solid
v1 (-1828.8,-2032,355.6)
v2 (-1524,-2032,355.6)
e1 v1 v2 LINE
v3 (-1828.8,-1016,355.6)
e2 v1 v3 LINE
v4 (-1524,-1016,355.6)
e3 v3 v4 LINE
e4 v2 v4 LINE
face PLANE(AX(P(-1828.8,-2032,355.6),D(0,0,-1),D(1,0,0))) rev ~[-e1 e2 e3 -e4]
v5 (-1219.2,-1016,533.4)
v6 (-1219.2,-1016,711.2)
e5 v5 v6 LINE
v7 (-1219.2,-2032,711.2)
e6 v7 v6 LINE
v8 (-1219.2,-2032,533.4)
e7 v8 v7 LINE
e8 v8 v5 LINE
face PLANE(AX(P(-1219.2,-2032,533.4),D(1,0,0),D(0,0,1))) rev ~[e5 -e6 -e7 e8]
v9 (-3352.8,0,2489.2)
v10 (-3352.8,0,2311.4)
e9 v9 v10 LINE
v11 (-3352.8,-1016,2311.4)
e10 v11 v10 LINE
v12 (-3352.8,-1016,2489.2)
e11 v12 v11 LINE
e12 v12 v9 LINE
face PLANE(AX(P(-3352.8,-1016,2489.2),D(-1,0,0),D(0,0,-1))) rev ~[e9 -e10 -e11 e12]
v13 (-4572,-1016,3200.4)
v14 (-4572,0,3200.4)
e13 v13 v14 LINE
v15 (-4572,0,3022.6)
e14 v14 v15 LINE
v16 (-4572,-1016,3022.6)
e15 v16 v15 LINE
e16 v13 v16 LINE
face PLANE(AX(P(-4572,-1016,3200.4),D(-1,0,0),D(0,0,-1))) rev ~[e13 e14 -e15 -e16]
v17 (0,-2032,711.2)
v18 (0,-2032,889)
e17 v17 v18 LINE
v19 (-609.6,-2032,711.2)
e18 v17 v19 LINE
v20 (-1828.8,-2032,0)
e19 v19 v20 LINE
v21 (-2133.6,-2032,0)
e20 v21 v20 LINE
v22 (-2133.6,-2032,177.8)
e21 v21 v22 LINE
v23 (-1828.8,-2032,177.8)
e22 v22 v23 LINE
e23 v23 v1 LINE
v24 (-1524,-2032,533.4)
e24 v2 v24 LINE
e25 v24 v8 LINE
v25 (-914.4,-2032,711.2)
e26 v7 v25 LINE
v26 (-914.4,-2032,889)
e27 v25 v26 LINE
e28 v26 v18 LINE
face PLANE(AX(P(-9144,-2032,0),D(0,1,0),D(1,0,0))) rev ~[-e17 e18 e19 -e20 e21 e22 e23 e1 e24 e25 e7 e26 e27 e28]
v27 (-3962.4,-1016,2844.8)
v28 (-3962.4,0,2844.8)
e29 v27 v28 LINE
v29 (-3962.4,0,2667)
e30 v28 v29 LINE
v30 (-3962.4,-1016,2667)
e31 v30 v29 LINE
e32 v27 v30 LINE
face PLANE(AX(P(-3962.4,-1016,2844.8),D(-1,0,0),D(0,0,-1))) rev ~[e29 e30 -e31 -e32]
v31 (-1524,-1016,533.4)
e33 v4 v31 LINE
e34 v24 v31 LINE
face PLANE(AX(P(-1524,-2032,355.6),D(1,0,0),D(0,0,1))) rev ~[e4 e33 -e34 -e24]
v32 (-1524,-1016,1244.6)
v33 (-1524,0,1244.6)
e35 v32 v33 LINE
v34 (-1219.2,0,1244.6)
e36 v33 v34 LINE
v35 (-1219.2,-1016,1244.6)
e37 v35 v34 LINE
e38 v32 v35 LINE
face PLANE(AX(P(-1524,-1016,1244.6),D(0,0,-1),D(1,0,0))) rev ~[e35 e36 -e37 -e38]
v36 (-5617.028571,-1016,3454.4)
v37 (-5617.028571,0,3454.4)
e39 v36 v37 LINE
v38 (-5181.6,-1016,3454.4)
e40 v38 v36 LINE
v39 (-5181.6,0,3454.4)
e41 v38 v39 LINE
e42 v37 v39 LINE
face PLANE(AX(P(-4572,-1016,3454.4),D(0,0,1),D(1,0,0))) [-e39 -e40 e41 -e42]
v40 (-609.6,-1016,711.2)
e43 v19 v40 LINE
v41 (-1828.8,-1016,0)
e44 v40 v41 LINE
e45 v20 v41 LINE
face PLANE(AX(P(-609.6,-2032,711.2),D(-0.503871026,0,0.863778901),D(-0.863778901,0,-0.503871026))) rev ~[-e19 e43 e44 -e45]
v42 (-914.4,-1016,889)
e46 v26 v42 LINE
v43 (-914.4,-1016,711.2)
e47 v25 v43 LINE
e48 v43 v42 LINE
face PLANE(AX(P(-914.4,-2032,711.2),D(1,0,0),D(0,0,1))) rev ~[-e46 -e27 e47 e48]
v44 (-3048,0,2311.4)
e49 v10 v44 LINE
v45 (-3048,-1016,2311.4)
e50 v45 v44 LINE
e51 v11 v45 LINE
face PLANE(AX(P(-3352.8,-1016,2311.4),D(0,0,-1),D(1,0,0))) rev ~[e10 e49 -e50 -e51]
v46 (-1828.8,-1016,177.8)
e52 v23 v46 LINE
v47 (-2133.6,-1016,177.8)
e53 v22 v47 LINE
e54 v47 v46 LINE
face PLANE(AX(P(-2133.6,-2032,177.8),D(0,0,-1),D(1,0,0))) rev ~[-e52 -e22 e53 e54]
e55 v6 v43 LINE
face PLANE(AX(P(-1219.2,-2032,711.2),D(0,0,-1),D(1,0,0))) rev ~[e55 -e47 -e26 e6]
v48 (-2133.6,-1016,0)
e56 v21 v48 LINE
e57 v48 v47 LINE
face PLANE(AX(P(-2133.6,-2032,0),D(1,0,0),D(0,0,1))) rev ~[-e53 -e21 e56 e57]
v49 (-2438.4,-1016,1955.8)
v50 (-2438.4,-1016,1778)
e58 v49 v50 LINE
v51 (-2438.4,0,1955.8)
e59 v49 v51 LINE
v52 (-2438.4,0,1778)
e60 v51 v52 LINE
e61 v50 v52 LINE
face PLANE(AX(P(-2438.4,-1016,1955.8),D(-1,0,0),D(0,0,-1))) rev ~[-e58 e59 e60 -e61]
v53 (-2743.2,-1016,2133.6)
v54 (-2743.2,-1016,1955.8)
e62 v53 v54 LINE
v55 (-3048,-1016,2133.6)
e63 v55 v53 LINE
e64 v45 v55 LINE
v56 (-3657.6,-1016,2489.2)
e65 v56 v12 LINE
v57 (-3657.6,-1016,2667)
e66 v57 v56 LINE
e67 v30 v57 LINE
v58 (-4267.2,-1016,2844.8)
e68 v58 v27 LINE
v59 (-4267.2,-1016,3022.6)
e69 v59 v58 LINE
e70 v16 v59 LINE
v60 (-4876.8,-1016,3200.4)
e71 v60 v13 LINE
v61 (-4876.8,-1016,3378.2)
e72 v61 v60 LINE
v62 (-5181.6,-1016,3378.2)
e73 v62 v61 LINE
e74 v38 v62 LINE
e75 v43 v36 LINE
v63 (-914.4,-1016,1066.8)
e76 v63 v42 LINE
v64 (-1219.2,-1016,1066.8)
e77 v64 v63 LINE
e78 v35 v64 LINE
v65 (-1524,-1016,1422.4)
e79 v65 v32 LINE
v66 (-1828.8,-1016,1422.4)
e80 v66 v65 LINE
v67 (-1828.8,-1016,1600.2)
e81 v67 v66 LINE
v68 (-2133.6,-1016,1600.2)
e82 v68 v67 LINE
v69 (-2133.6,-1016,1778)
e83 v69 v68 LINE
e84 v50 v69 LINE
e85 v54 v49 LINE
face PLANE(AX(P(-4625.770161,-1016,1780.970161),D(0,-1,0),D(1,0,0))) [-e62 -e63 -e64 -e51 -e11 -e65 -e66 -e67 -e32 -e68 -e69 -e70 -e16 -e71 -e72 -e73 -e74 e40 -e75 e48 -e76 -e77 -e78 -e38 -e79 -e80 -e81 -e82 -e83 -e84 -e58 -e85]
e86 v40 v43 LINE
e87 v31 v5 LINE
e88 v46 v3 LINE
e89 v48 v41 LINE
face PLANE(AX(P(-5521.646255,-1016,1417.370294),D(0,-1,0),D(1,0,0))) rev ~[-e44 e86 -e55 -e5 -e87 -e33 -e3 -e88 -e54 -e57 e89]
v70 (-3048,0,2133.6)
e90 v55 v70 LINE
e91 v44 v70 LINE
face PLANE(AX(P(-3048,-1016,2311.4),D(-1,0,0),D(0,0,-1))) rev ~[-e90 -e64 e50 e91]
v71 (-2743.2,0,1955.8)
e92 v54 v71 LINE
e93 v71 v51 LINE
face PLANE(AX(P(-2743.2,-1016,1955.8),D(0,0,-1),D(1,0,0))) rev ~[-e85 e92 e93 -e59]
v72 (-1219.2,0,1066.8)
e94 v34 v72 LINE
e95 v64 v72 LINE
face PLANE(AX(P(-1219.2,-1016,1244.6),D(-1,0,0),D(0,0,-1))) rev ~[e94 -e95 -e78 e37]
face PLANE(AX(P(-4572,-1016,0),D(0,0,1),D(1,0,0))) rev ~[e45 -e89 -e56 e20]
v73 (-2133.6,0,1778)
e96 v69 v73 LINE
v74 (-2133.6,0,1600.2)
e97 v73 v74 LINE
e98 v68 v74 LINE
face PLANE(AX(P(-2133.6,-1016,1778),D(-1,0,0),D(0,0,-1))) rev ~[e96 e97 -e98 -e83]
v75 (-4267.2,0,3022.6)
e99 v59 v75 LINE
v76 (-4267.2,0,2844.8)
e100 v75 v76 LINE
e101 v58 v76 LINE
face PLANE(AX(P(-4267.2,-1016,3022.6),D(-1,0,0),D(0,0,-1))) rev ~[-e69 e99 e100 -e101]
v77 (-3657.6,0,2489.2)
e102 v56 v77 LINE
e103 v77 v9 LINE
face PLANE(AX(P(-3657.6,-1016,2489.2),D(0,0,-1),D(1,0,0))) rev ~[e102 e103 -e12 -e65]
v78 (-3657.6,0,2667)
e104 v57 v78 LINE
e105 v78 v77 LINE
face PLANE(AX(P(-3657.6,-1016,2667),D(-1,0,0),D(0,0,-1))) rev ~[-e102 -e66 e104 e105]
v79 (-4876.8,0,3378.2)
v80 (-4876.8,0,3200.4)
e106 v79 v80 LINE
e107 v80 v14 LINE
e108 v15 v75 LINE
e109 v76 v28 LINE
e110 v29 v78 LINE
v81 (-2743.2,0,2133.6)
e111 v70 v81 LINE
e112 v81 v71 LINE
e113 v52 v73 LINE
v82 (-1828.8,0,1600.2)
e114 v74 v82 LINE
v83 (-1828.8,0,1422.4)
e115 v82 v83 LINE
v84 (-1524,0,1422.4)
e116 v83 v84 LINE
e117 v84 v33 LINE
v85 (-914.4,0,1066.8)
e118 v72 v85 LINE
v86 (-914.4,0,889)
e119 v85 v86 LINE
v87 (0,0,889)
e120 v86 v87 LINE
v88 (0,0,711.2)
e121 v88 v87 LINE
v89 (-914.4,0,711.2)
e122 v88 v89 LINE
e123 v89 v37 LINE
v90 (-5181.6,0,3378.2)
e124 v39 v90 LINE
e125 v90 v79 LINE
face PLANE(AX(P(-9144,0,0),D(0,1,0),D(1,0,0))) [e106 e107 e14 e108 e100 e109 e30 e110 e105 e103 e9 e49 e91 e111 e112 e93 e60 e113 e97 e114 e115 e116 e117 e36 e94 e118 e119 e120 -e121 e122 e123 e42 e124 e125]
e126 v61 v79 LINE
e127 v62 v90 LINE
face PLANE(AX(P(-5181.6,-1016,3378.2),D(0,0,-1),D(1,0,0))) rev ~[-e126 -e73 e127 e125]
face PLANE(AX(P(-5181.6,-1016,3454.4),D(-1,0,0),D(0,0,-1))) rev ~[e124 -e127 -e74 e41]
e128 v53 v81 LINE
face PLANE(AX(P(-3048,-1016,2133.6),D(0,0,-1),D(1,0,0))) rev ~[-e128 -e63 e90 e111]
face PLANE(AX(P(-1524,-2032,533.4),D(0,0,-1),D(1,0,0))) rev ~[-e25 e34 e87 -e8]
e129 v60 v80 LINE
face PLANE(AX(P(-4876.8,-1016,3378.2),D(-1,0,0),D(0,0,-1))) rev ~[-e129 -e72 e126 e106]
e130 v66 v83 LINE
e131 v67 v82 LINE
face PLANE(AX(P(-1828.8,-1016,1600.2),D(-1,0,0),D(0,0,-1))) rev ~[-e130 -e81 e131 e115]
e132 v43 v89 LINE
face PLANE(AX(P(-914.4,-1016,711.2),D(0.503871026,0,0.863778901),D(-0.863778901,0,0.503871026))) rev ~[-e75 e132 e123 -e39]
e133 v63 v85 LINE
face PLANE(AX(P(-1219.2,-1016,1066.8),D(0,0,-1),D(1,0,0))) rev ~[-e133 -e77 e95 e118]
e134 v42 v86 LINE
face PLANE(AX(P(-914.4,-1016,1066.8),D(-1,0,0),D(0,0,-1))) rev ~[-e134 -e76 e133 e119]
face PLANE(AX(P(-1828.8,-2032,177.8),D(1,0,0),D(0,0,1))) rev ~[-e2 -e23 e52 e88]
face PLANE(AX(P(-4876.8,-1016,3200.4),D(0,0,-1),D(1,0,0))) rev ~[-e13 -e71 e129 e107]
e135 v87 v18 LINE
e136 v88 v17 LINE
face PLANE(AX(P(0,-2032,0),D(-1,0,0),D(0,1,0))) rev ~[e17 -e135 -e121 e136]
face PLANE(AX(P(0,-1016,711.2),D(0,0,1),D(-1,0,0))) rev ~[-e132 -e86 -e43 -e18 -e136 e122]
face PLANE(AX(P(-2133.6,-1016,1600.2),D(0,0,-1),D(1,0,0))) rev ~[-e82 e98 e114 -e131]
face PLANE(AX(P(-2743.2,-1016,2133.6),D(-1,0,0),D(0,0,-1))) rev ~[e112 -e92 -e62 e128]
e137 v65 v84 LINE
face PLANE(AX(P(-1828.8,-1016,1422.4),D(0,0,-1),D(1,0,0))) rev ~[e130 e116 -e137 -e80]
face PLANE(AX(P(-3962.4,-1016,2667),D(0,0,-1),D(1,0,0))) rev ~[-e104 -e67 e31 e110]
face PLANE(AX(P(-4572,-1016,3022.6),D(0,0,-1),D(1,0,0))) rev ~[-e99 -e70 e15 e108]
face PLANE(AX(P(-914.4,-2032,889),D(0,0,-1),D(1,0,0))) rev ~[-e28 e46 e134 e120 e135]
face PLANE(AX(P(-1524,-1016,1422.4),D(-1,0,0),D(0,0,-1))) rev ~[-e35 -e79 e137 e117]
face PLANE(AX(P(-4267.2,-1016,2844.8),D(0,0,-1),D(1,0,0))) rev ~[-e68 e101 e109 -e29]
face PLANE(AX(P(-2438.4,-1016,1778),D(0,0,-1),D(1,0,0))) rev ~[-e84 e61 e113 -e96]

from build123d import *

# Parameters (mm, degrees)
F0_W     = 9144
F0_H     = 2032
F1_DEPTH = 3454.4
F3_DEPTH = 1016
F5_DEPTH = 1016


# Not quite as in the source:
# - a feature names something its author has since deleted; it is built from what else it names


with BuildPart() as f1:
    # F0 (on Top) → F1 (new body)
    with BuildSketch(Plane.XY):
        with Locations((-4572, -1016)):
            Rectangle(F0_W, F0_H)
    extrude(amount=F1_DEPTH)

    # F2 (on face) → F3 (cut)
    with BuildSketch(Plane.XZ.offset(2032)):
        Polygon((-2341.2702168835, 0), (-2133.6, 0), (-2133.6, 177.8), (-1828.8, 177.8), (-1828.8, 355.6), (-1524, 355.6), (-1524, 533.4), (-1219.2, 533.4), (-1219.2, 711.2), (-914.4, 711.2), (-914.4, 889), (0, 889), (0, 3454.4), (-9144, 3454.4), (-9144, 0), align=None)
        Polygon((-609.6, 711.2), (-1828.8, 0), (0, 0), (0, 711.2), align=None)
    extrude(amount=-F3_DEPTH, mode=Mode.SUBTRACT)

    # F4 (on face) → F5 (cut, through all)
    with BuildSketch(Plane.XZ.offset(1016)):
        Polygon((-1219.2, 711.2), (-914.4, 711.2), (-5617.0285714286, 3454.4), (-9144, 3454.4), (-9144, 0), (-2133.6, 0), (-2133.6, 177.8), (-1828.8, 177.8), (-1828.8, 355.6), (-1524, 355.6), (-1524, 533.4), (-1219.2, 533.4), align=None)
        Polygon((-914.4, 1066.8), (-914.4, 889), (0, 889), (0, 3454.4), (-5181.6, 3454.4), (-5181.6, 3378.2), (-4876.8, 3378.2), (-4876.8, 3200.4), (-4572, 3200.4), (-4572, 3022.6), (-4267.2, 3022.6), (-4267.2, 2844.8), (-3962.4, 2844.8), (-3962.4, 2667), (-3657.6, 2667), (-3657.6, 2489.2), (-3352.8, 2489.2), (-3352.8, 2311.4), (-3048, 2311.4), (-3048, 2133.6), (-2743.2, 2133.6), (-2743.2, 1955.8), (-2438.4, 1955.8), (-2438.4, 1778), (-2133.6, 1778), (-2133.6, 1600.2), (-1828.8, 1600.2), (-1828.8, 1422.4), (-1524, 1422.4), (-1524, 1244.6), (-1219.2, 1244.6), (-1219.2, 1066.8), align=None)
        Polygon((0, 711.2), (-914.4, 711.2), (-1219.2, 711.2), (-1219.2, 533.4), (-1524, 533.4), (-1524, 355.6), (-1828.8, 355.6), (-1828.8, 177.8), (-2133.6, 177.8), (-2133.6, 0), (0, 0), align=None)
    extrude(amount=-F5_DEPTH, mode=Mode.SUBTRACT)


solid = f1.part
